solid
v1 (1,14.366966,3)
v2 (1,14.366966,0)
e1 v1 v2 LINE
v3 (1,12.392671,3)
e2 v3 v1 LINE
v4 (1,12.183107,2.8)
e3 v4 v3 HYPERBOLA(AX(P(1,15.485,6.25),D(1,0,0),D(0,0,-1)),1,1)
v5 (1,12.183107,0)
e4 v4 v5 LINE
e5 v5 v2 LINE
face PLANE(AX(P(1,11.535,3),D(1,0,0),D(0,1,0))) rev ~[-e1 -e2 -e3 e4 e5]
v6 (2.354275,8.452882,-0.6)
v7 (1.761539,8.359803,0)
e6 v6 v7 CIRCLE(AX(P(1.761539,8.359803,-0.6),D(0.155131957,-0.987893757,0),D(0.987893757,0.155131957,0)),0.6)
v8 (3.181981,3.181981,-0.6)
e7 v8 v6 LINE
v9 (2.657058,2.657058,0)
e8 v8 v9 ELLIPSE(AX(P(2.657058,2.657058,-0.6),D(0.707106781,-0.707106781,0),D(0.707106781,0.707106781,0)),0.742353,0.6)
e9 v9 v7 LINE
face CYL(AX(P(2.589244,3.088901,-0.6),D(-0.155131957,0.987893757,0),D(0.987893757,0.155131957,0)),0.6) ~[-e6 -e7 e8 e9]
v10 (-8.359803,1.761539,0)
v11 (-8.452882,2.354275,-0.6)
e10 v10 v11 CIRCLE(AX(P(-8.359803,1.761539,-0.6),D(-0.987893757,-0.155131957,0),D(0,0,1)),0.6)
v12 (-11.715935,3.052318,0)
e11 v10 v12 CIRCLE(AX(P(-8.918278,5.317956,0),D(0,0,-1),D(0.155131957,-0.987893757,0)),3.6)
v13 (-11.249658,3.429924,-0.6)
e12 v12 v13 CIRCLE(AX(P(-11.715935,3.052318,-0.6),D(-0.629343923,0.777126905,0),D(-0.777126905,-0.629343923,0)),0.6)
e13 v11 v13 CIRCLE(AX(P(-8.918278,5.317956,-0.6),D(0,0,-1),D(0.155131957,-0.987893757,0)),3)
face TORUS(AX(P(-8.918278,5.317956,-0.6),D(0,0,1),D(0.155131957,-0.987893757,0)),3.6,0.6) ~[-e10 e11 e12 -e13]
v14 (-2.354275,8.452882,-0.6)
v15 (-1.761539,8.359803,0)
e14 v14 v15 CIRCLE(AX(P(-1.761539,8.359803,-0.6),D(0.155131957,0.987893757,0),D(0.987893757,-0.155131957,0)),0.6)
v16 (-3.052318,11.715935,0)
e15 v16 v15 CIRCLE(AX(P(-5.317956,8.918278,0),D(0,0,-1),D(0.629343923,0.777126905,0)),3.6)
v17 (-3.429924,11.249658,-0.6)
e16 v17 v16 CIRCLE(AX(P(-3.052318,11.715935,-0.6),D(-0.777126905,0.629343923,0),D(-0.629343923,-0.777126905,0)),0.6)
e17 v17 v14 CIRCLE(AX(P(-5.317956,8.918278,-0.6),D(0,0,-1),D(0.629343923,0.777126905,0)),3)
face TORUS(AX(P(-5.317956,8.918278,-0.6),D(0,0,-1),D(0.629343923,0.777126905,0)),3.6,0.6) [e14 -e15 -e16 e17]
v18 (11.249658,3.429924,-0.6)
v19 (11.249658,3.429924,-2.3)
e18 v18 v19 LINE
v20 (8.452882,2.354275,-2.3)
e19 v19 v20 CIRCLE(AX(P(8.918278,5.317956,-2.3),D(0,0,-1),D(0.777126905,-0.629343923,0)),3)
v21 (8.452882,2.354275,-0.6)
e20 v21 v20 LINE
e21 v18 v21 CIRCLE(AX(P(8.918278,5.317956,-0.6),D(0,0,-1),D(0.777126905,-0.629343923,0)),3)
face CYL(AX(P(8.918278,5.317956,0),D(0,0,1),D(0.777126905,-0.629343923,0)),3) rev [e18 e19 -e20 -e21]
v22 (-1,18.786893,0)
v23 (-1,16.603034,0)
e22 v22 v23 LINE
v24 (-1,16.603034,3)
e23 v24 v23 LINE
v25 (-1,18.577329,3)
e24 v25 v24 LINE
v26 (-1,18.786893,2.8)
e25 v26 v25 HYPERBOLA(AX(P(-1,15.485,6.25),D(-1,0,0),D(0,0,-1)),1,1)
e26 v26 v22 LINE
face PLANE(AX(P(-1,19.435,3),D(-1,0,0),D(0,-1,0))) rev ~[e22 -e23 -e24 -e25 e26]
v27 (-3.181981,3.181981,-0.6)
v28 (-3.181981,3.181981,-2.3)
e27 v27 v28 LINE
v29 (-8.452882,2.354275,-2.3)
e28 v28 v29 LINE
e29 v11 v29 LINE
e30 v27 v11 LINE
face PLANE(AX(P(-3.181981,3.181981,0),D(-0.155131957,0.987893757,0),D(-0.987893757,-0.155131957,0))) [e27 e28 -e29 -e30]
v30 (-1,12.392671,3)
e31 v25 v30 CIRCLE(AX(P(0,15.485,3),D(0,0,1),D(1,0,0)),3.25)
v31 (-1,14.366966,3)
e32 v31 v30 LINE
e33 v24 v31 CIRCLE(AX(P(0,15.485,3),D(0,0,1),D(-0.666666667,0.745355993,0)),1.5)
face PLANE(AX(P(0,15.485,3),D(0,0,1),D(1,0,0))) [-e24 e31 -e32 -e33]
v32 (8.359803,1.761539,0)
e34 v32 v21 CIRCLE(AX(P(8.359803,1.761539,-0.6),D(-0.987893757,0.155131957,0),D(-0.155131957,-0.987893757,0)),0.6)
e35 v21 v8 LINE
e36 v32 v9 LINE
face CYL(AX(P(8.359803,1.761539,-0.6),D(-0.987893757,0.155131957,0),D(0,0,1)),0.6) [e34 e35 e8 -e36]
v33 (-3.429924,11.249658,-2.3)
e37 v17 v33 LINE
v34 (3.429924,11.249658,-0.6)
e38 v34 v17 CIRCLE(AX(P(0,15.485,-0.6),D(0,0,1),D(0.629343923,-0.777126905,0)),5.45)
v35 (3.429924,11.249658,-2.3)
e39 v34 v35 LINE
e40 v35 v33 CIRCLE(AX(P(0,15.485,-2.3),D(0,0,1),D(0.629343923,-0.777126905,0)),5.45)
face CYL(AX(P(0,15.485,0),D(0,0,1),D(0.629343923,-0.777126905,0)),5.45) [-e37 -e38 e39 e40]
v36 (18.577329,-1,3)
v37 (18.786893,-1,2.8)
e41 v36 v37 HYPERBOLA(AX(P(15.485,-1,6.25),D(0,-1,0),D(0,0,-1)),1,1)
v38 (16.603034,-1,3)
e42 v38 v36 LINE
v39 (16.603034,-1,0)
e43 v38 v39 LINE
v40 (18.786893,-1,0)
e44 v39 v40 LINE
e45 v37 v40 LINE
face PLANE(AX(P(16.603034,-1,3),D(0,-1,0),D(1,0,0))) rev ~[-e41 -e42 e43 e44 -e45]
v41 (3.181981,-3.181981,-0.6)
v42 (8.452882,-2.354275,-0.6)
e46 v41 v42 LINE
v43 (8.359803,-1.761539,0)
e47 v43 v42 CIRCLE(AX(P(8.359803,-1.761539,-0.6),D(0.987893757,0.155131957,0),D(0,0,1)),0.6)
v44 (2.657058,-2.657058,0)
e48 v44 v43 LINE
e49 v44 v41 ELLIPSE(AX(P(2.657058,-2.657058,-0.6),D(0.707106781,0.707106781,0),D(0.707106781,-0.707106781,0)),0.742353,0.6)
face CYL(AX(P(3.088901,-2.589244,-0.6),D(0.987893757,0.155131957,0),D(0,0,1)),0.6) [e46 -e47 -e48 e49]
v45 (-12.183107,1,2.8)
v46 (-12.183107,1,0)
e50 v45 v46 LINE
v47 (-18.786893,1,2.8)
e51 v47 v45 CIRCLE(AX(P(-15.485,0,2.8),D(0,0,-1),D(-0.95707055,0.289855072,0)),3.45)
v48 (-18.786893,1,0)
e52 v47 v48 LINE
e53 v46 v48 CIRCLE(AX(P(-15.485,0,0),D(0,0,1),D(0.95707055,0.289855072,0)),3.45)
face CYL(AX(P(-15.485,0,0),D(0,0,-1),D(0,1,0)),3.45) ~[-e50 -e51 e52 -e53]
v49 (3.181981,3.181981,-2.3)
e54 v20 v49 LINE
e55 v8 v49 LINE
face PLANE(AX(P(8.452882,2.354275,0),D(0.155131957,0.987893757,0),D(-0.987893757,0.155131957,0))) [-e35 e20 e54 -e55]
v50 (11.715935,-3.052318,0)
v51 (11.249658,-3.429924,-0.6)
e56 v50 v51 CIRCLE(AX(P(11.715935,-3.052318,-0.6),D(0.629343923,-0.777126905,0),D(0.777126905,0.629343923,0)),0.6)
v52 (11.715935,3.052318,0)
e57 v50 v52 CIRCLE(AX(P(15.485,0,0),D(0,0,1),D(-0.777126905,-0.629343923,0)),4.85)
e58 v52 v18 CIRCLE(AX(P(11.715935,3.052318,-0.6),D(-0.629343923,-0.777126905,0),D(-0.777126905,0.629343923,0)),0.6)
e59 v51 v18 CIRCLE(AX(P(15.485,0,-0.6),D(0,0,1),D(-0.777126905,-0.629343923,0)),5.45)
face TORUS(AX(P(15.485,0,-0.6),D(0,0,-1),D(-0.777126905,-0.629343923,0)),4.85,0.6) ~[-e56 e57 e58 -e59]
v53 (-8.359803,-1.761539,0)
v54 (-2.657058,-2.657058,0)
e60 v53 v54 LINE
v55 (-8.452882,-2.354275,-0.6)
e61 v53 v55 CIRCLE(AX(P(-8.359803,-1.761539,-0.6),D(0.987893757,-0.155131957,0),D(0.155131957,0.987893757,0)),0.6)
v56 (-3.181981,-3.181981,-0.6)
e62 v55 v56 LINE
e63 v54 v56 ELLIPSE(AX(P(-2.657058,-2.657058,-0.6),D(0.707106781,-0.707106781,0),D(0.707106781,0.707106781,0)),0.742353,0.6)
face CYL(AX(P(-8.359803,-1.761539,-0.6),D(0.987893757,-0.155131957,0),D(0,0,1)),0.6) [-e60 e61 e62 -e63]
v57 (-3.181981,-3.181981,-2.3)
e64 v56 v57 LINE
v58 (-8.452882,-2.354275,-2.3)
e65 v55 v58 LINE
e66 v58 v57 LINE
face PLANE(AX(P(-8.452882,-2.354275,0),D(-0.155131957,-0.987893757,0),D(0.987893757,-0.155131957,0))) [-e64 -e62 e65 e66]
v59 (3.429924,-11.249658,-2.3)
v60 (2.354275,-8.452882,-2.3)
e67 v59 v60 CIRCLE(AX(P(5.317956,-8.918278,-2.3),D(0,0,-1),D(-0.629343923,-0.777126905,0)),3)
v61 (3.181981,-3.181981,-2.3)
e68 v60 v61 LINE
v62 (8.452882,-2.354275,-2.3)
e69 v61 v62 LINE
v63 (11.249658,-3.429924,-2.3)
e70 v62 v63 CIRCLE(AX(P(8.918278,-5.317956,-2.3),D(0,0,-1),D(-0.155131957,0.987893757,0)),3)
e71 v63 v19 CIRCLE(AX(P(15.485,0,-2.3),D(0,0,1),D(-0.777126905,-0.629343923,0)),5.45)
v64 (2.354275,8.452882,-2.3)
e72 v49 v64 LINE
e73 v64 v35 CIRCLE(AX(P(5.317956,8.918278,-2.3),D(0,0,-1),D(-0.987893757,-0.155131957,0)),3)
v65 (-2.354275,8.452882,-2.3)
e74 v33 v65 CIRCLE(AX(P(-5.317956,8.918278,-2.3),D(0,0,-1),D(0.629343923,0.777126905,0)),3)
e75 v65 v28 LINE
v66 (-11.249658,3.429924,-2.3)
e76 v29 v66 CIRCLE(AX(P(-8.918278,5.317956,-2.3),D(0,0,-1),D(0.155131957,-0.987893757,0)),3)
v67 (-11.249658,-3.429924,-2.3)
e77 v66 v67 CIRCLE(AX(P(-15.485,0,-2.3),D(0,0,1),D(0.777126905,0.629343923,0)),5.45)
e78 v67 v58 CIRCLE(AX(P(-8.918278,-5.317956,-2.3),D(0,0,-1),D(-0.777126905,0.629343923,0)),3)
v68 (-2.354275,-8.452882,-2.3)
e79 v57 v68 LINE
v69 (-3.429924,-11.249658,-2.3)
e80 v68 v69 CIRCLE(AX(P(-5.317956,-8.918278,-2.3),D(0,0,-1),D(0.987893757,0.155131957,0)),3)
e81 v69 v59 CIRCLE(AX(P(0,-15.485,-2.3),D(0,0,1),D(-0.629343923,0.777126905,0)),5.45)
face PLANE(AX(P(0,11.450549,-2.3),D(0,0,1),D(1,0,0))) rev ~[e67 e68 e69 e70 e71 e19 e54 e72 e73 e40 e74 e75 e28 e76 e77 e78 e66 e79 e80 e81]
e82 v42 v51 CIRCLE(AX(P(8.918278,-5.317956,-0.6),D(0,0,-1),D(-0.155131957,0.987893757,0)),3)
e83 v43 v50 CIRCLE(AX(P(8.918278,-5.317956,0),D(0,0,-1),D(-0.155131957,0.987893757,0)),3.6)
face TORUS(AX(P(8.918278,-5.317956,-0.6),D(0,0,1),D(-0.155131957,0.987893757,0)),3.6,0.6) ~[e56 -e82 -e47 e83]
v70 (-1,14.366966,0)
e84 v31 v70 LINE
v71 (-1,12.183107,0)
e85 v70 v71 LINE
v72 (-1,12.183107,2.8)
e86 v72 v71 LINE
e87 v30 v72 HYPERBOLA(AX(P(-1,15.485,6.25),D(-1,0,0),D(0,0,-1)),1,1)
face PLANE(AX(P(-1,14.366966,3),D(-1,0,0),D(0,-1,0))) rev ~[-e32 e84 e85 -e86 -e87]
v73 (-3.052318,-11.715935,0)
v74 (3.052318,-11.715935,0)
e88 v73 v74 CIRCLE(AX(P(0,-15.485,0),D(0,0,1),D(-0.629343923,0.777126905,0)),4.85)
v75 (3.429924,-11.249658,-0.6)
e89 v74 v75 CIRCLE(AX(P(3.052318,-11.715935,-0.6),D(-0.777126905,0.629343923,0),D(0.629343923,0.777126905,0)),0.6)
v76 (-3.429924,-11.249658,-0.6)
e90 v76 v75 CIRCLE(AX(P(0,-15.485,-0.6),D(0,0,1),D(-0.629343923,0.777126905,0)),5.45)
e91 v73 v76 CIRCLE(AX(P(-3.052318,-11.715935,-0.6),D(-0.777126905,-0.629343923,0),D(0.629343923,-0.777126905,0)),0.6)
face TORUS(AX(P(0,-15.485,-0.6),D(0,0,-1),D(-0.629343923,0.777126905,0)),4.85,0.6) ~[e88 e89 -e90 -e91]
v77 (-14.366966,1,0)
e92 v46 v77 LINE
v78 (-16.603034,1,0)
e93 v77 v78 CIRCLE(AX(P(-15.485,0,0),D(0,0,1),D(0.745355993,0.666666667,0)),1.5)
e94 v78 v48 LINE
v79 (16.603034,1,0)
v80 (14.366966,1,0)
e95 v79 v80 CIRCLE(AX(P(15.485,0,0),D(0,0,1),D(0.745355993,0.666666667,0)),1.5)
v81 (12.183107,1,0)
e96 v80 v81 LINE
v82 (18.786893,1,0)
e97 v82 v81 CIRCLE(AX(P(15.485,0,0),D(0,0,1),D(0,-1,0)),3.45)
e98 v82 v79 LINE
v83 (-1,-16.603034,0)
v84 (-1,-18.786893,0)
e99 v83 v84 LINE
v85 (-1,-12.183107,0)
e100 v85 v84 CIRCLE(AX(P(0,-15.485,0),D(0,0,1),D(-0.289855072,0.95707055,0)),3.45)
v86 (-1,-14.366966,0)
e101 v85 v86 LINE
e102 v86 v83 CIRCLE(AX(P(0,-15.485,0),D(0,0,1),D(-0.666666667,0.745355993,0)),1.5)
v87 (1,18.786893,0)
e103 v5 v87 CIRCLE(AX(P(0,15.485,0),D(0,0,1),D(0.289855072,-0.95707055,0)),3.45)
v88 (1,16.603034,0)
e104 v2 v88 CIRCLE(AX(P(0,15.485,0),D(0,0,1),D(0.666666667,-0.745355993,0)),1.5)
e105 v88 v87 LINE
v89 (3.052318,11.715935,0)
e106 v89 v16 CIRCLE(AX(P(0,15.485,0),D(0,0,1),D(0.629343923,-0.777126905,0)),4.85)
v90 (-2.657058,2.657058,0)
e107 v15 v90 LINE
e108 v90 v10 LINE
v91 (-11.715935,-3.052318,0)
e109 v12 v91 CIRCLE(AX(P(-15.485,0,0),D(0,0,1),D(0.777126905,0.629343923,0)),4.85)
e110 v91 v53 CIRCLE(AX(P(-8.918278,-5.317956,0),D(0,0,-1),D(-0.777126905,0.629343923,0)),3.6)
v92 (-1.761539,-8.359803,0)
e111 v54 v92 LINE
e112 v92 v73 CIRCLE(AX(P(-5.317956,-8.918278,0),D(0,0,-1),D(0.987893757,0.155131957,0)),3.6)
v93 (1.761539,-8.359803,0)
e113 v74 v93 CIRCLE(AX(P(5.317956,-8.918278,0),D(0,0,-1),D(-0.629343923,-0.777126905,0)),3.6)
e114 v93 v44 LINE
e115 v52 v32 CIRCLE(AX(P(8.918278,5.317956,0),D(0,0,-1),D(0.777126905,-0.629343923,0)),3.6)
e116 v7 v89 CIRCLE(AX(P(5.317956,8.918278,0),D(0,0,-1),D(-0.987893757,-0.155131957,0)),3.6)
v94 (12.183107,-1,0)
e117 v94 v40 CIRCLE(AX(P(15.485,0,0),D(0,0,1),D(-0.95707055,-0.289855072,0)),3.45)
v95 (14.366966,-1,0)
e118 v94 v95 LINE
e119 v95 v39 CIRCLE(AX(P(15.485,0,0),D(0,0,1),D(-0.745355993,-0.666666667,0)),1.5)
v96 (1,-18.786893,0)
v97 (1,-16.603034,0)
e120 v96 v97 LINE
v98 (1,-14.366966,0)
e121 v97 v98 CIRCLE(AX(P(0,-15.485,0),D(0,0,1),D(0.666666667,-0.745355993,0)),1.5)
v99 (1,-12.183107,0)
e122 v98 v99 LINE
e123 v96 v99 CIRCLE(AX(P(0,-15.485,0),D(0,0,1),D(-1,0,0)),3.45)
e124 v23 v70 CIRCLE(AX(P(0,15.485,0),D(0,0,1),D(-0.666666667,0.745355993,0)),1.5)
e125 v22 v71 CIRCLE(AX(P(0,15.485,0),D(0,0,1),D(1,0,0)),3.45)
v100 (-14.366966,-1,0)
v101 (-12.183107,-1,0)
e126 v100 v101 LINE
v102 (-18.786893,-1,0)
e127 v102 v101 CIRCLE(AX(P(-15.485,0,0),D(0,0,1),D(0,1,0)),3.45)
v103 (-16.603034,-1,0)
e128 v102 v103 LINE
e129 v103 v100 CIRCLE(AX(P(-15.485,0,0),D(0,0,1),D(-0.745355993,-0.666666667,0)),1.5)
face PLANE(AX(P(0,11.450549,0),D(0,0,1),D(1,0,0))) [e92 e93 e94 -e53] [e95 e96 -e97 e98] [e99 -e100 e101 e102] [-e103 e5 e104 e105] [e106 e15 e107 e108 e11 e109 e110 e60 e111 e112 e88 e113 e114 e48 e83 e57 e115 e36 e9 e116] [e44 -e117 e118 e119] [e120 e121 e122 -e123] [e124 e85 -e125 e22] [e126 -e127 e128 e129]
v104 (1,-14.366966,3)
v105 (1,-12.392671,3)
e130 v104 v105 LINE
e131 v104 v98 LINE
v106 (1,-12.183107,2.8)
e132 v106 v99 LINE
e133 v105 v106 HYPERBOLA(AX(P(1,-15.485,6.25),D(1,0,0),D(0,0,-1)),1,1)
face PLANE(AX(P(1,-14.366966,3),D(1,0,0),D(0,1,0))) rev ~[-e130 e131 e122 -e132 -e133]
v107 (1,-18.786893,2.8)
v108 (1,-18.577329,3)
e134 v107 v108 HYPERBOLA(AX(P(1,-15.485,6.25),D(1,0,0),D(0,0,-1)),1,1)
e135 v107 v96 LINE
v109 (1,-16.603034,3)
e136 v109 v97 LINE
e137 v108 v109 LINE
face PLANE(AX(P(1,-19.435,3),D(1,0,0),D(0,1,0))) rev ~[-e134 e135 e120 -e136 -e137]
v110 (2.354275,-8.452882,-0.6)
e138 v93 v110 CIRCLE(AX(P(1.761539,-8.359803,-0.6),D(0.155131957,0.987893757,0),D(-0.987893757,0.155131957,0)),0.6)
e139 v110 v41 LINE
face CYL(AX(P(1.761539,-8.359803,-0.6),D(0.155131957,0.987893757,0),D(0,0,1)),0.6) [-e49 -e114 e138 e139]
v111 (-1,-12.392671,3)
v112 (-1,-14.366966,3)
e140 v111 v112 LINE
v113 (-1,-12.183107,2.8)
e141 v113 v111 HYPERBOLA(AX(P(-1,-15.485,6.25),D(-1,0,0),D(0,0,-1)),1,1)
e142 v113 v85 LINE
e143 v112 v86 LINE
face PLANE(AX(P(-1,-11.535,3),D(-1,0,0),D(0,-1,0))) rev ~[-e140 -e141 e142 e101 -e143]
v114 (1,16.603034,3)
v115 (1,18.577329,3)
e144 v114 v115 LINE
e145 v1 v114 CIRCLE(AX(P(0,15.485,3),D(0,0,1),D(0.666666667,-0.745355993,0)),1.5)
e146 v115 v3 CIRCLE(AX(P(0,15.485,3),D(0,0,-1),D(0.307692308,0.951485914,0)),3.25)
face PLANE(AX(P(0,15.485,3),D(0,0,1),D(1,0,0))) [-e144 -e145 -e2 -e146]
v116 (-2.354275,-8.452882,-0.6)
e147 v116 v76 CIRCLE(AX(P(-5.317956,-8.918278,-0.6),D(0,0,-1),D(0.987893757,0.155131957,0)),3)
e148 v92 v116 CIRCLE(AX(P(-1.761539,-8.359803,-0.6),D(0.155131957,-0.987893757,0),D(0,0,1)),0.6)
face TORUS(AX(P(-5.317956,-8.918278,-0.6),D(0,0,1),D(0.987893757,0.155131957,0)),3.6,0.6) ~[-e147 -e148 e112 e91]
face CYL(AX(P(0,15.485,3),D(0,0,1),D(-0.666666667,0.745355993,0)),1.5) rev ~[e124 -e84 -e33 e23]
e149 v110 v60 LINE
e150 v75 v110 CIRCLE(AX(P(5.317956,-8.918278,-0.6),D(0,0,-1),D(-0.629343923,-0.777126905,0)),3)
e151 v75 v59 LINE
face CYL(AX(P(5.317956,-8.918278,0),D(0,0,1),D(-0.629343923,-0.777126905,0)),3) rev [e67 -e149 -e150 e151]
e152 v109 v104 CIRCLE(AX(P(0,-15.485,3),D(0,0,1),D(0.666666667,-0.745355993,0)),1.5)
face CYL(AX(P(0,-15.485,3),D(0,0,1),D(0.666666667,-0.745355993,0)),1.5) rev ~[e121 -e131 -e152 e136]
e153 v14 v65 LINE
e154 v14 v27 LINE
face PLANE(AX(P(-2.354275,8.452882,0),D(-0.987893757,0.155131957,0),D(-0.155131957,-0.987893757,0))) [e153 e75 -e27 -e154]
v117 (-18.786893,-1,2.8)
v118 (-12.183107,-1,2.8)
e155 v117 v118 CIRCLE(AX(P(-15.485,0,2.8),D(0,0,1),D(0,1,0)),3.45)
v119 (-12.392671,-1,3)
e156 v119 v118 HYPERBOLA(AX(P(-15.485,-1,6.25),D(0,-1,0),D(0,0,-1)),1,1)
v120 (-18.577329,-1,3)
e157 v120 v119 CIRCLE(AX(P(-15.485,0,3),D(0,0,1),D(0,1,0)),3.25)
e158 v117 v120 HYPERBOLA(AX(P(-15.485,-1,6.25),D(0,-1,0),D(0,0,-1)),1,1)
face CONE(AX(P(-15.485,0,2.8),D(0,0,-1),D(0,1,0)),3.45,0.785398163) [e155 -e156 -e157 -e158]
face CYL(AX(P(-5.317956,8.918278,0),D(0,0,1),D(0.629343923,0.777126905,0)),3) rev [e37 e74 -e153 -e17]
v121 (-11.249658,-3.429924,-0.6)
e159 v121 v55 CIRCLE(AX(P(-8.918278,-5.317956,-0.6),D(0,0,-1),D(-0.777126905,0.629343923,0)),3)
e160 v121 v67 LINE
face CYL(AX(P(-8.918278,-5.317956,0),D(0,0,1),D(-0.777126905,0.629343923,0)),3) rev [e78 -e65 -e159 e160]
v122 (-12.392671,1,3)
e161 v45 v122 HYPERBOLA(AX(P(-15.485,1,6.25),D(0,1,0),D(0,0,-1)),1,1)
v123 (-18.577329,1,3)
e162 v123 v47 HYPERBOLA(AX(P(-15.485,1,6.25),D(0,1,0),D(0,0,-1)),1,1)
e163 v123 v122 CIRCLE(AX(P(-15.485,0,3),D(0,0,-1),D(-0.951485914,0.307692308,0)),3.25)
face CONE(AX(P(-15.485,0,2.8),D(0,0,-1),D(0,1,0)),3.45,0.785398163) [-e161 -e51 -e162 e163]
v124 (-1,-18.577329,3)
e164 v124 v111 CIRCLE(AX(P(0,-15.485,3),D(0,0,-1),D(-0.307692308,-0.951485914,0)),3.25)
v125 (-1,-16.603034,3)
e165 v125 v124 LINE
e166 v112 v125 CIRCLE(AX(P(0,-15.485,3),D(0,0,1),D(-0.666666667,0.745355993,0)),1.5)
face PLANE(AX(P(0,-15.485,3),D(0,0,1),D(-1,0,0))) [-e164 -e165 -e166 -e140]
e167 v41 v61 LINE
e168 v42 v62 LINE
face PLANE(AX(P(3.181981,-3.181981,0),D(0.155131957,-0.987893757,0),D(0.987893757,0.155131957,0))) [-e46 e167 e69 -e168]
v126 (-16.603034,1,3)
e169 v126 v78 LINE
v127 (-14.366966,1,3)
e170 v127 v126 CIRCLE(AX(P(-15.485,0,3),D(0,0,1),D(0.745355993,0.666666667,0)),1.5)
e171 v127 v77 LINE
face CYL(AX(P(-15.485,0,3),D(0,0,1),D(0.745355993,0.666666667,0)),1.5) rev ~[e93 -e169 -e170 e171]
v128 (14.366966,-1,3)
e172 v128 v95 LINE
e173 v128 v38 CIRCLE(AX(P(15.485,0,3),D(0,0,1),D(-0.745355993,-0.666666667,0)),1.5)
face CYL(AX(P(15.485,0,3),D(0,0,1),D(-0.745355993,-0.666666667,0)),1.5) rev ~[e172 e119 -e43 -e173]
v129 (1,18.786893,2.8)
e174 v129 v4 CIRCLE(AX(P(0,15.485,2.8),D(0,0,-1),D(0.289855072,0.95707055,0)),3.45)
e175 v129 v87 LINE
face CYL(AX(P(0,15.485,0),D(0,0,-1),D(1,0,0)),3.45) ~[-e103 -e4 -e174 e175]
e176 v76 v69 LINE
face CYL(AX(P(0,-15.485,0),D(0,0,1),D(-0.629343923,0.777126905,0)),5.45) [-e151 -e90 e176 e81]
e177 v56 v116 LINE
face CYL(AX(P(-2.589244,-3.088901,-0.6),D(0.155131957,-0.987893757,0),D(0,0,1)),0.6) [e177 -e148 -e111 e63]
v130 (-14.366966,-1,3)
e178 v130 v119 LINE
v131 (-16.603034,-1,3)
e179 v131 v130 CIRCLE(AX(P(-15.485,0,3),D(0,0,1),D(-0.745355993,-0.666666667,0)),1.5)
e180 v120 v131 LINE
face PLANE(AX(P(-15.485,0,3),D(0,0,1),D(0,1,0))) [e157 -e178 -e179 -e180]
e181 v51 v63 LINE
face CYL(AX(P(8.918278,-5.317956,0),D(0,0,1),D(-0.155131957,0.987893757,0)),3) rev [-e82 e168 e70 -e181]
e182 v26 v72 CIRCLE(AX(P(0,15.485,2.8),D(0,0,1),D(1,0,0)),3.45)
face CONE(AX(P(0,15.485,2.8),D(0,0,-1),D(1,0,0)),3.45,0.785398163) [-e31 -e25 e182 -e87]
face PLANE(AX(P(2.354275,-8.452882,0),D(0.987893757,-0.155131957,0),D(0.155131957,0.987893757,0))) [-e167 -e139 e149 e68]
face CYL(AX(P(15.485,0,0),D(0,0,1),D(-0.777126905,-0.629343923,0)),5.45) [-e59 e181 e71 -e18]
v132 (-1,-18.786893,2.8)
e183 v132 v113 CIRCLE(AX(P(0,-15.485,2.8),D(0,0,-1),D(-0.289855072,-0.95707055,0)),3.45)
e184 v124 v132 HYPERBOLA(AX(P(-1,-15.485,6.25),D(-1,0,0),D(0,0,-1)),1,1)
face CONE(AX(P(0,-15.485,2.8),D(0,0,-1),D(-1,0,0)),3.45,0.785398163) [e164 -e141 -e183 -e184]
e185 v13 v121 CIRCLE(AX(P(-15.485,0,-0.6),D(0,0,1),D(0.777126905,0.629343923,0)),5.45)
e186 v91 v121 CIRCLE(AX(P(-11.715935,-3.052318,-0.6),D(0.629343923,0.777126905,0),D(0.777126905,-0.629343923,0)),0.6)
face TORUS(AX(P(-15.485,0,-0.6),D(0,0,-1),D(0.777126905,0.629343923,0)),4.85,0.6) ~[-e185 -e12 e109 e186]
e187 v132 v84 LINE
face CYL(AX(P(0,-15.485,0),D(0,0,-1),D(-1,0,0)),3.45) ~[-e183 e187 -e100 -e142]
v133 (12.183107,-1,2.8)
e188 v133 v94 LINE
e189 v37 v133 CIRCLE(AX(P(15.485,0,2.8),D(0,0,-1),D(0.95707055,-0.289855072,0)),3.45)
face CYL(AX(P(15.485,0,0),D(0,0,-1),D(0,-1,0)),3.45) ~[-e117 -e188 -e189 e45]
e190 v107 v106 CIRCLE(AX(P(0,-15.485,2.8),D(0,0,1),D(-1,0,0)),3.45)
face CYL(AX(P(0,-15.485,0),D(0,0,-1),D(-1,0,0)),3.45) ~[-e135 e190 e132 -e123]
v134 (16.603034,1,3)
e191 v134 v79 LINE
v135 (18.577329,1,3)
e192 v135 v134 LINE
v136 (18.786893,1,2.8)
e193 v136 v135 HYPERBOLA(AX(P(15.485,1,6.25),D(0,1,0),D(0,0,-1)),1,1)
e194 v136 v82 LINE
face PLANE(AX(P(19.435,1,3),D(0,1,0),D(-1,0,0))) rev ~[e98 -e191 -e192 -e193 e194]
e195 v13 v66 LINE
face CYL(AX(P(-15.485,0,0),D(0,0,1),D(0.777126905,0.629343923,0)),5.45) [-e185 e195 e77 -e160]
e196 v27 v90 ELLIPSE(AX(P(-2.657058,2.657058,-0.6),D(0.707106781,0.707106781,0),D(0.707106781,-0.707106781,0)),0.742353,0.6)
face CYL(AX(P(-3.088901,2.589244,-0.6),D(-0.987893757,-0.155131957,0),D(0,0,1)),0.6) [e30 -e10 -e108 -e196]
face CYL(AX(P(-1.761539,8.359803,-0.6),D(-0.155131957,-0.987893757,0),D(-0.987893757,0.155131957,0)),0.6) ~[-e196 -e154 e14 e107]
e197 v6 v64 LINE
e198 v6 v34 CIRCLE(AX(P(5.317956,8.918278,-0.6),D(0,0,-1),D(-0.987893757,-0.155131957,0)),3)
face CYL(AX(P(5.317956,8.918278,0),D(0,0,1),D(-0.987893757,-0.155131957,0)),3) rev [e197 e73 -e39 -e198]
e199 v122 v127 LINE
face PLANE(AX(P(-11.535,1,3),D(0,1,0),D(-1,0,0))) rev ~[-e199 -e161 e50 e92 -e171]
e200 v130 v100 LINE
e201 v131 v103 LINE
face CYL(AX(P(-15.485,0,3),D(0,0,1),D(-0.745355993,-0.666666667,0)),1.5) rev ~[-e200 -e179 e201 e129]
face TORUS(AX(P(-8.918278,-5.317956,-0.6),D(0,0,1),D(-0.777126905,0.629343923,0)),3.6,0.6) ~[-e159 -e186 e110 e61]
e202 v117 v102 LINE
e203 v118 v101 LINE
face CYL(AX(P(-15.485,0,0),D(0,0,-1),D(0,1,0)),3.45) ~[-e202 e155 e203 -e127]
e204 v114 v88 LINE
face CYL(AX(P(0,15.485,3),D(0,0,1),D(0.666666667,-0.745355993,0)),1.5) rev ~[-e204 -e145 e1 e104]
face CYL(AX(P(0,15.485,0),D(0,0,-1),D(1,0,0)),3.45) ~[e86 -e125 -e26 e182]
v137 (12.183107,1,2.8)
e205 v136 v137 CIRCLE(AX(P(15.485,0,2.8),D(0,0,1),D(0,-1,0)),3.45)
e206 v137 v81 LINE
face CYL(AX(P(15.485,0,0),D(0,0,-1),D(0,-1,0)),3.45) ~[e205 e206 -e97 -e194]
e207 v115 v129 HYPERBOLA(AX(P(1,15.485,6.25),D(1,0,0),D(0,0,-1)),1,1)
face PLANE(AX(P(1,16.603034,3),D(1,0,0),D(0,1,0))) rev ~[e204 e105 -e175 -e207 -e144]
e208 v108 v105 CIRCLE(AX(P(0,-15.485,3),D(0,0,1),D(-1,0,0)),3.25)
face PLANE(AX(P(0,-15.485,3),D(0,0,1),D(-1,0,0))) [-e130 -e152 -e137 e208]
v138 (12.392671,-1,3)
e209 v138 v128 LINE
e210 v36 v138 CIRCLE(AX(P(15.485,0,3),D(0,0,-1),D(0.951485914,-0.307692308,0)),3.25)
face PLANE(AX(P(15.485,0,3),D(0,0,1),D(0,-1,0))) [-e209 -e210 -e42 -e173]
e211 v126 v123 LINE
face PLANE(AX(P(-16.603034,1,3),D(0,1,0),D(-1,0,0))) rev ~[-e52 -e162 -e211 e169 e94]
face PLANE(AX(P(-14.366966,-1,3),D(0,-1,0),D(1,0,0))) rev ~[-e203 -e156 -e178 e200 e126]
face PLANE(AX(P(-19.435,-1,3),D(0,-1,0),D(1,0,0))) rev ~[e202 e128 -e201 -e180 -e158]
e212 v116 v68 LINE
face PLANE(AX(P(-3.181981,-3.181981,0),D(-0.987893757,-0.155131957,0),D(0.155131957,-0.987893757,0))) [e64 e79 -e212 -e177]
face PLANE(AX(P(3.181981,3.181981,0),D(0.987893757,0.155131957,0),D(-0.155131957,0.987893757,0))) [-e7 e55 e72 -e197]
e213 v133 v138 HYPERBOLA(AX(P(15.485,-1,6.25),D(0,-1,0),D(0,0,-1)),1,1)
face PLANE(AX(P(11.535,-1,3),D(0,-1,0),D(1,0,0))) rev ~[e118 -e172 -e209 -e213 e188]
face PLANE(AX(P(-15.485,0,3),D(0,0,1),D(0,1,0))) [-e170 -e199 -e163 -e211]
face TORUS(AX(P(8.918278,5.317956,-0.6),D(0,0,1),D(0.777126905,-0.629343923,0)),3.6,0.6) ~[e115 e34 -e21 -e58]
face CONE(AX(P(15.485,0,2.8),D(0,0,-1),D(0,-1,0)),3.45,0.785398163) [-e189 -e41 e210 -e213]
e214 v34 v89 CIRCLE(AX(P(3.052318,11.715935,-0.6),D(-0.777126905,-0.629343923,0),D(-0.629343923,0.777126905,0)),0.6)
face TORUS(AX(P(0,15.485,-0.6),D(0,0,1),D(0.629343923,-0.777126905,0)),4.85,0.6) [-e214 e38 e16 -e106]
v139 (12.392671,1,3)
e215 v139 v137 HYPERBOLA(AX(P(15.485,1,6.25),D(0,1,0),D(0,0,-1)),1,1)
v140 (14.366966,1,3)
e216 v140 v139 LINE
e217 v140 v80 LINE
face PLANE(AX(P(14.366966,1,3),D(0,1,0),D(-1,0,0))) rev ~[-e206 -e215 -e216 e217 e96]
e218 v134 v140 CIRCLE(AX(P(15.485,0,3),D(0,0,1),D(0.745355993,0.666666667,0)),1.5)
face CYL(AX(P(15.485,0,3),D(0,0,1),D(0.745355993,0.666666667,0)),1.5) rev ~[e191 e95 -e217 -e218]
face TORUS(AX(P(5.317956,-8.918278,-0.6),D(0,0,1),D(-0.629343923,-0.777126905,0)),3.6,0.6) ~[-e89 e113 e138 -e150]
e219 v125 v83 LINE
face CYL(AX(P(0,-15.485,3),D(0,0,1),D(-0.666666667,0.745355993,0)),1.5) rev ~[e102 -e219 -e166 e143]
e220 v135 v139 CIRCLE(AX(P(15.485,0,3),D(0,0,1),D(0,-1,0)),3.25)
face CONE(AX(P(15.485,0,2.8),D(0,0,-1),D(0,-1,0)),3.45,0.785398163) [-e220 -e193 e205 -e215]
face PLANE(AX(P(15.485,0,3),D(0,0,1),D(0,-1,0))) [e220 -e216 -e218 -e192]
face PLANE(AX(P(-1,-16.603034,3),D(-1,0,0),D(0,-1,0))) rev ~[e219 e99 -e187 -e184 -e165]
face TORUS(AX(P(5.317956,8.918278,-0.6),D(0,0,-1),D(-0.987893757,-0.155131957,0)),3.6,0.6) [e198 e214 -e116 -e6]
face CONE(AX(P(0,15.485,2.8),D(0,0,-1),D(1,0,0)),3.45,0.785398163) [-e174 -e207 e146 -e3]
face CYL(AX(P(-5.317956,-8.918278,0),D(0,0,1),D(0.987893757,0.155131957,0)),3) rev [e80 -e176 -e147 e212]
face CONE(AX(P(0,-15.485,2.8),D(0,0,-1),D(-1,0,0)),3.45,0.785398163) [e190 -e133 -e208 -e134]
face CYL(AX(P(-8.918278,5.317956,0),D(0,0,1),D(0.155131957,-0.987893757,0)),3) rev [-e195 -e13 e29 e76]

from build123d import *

# Parameters (mm, degrees)
F0_R     = 3.45
F1_DEPTH = 3
F2_SIZE  = 0.2
F4_DEPTH = 3
F6_COUNT = 4
F8_DEPTH = 2.3
F9_R     = 0.6


# Not quite as in the source:
# - a feature names something its author has since deleted; it is built from what else it names


with BuildPart() as f1:
    # F0 (on Top) → F1 (new body)
    with BuildSketch(Plane.XY):
        with Locations((0, 15.485)):
            Circle(F0_R)
    extrude(amount=F1_DEPTH)

    # F2
    f2_edges = [f1.edges().sort_by_distance(p)[0] for p in [
        (-3.45, 15.485, 3),
    ]]
    chamfer(f2_edges, length=F2_SIZE)

    # F3 (on face) → F4 (cut, through all)
    with BuildSketch(Plane.XY.offset(3)):
        with BuildLine():
            Line((-1, 19.435), (-1, 16.6030339887))
            ThreePointArc((-1, 16.6030339887), (-1.5, 15.485), (-1, 14.3669660113))
            Line((-1, 14.3669660113), (-1, 11.535))
            Line((-1, 11.535), (1, 11.535))
            Line((1, 11.535), (1, 14.3669660113))
            ThreePointArc((1, 14.3669660113), (1.5, 15.485), (1, 16.6030339887))
            Line((1, 16.6030339887), (1, 19.435))
            Line((1, 19.435), (-1, 19.435))
        make_face()
    extrude(amount=-F4_DEPTH, mode=Mode.SUBTRACT)


with BuildPart() as f6_1:
    # F6: instance of F1
    add(f1.part.rotate(Axis((0, 0, 1.3403603807), (0, 0, 1)), 1 * 360 / F6_COUNT))


with BuildPart() as f6_2:
    # F6: instance of F1
    add(f1.part.rotate(Axis((0, 0, 1.3403603807), (0, 0, 1)), 2 * 360 / F6_COUNT))


with BuildPart() as f6_3:
    # F6: instance of F1
    add(f1.part.rotate(Axis((0, 0, 1.3403603807), (0, 0, 1)), 3 * 360 / F6_COUNT))


with BuildPart() as f1_1:
    add(f1.part)

    add(f6_1.part)  # F8 merges F6_1

    add(f6_2.part)  # F8 merges F6_2

    add(f6_3.part)  # F8 merges F6_3
    # F7 (on Top) → F8 (join)
    with BuildSketch(Plane.XY):
        with BuildLine():
            ThreePointArc((2.3542748808, 8.4528817839), (2.5179079965, 9.995185414), (3.4299243827, 11.2496583693))
            ThreePointArc((3.4299243827, 11.2496583693), (0, 20.935), (-3.4299243827, 11.2496583693))
            ThreePointArc((-3.4299243827, 11.2496583693), (-2.5179079965, 9.995185414), (-2.3542748808, 8.4528817839))
            Line((-2.3542748808, 8.4528817839), (-3.1819805153, 3.1819805153))
            Line((-3.1819805153, 3.1819805153), (0, 4.5))
            Line((0, 4.5), (3.1819805153, 3.1819805153))
            Line((3.1819805153, 3.1819805153), (2.3542748808, 8.4528817839))
        make_face()
        Polygon((4.5, 0), (3.1819805153, 3.1819805153), (0, 4.5), (-3.1819805153, 3.1819805153), (-4.5, 0), (-3.1819805153, -3.1819805153), (0, -4.5), (3.1819805153, -3.1819805153), align=None)
        with BuildLine():
            Line((8.4528817839, 2.3542748808), (3.1819805153, 3.1819805153))
            Line((3.1819805153, 3.1819805153), (4.5, 0))
            Line((4.5, 0), (3.1819805153, -3.1819805153))
            Line((3.1819805153, -3.1819805153), (8.4528817839, -2.3542748808))
            ThreePointArc((8.4528817839, -2.3542748808), (9.995185414, -2.5179079965), (11.2496583693, -3.4299243827))
            ThreePointArc((11.2496583693, -3.4299243827), (20.935, 0), (11.2496583693, 3.4299243827))
            ThreePointArc((11.2496583693, 3.4299243827), (9.995185414, 2.5179079965), (8.4528817839, 2.3542748808))
        make_face()
        with BuildLine():
            Line((-4.5, 0), (-3.1819805153, 3.1819805153))
            Line((-3.1819805153, 3.1819805153), (-8.4528817839, 2.3542748808))
            ThreePointArc((-8.4528817839, 2.3542748808), (-9.995185414, 2.5179079965), (-11.2496583693, 3.4299243827))
            ThreePointArc((-11.2496583693, 3.4299243827), (-20.935, 0), (-11.2496583693, -3.4299243827))
            ThreePointArc((-11.2496583693, -3.4299243827), (-9.995185414, -2.5179079965), (-8.4528817839, -2.3542748808))
            Line((-8.4528817839, -2.3542748808), (-3.1819805153, -3.1819805153))
            Line((-3.1819805153, -3.1819805153), (-4.5, 0))
        make_face()
        with BuildLine():
            Line((2.3542748808, -8.4528817839), (3.1819805153, -3.1819805153))
            Line((3.1819805153, -3.1819805153), (0, -4.5))
            Line((0, -4.5), (-3.1819805153, -3.1819805153))
            Line((-3.1819805153, -3.1819805153), (-2.3542748808, -8.4528817839))
            ThreePointArc((-2.3542748808, -8.4528817839), (-2.5179079965, -9.995185414), (-3.4299243827, -11.2496583693))
            ThreePointArc((-3.4299243827, -11.2496583693), (0, -20.935), (3.4299243827, -11.2496583693))
            ThreePointArc((3.4299243827, -11.2496583693), (2.5179079965, -9.995185414), (2.3542748808, -8.4528817839))
        make_face()
    extrude(amount=-F8_DEPTH)

    # F9
    f9_edges = [f1_1.edges().sort_by_distance(p)[0] for p in [
        (2.768128, 5.817431, 0),
        (5.817431, 2.768128, 0),
        (2.517908, 9.995185, 0),
        (9.995185, 2.517908, 0),
        (0, 20.935, 0),
        (20.935, 0, 0),
        (-2.517908, 9.995185, 0),
        (9.995185, -2.517908, 0),
        (-2.768128, 5.817431, 0),
        (5.817431, -2.768128, 0),
        (-5.817431, 2.768128, 0),
        (2.768128, -5.817431, 0),
        (-9.995185, 2.517908, 0),
        (2.517908, -9.995185, 0),
        (-20.935, 0, 0),
        (0, -20.935, 0),
        (-9.995185, -2.517908, 0),
        (-2.517908, -9.995185, 0),
        (-5.817431, -2.768128, 0),
        (-2.768128, -5.817431, 0),
    ]]
    fillet(f9_edges, radius=F9_R)


solid = f1_1.part
